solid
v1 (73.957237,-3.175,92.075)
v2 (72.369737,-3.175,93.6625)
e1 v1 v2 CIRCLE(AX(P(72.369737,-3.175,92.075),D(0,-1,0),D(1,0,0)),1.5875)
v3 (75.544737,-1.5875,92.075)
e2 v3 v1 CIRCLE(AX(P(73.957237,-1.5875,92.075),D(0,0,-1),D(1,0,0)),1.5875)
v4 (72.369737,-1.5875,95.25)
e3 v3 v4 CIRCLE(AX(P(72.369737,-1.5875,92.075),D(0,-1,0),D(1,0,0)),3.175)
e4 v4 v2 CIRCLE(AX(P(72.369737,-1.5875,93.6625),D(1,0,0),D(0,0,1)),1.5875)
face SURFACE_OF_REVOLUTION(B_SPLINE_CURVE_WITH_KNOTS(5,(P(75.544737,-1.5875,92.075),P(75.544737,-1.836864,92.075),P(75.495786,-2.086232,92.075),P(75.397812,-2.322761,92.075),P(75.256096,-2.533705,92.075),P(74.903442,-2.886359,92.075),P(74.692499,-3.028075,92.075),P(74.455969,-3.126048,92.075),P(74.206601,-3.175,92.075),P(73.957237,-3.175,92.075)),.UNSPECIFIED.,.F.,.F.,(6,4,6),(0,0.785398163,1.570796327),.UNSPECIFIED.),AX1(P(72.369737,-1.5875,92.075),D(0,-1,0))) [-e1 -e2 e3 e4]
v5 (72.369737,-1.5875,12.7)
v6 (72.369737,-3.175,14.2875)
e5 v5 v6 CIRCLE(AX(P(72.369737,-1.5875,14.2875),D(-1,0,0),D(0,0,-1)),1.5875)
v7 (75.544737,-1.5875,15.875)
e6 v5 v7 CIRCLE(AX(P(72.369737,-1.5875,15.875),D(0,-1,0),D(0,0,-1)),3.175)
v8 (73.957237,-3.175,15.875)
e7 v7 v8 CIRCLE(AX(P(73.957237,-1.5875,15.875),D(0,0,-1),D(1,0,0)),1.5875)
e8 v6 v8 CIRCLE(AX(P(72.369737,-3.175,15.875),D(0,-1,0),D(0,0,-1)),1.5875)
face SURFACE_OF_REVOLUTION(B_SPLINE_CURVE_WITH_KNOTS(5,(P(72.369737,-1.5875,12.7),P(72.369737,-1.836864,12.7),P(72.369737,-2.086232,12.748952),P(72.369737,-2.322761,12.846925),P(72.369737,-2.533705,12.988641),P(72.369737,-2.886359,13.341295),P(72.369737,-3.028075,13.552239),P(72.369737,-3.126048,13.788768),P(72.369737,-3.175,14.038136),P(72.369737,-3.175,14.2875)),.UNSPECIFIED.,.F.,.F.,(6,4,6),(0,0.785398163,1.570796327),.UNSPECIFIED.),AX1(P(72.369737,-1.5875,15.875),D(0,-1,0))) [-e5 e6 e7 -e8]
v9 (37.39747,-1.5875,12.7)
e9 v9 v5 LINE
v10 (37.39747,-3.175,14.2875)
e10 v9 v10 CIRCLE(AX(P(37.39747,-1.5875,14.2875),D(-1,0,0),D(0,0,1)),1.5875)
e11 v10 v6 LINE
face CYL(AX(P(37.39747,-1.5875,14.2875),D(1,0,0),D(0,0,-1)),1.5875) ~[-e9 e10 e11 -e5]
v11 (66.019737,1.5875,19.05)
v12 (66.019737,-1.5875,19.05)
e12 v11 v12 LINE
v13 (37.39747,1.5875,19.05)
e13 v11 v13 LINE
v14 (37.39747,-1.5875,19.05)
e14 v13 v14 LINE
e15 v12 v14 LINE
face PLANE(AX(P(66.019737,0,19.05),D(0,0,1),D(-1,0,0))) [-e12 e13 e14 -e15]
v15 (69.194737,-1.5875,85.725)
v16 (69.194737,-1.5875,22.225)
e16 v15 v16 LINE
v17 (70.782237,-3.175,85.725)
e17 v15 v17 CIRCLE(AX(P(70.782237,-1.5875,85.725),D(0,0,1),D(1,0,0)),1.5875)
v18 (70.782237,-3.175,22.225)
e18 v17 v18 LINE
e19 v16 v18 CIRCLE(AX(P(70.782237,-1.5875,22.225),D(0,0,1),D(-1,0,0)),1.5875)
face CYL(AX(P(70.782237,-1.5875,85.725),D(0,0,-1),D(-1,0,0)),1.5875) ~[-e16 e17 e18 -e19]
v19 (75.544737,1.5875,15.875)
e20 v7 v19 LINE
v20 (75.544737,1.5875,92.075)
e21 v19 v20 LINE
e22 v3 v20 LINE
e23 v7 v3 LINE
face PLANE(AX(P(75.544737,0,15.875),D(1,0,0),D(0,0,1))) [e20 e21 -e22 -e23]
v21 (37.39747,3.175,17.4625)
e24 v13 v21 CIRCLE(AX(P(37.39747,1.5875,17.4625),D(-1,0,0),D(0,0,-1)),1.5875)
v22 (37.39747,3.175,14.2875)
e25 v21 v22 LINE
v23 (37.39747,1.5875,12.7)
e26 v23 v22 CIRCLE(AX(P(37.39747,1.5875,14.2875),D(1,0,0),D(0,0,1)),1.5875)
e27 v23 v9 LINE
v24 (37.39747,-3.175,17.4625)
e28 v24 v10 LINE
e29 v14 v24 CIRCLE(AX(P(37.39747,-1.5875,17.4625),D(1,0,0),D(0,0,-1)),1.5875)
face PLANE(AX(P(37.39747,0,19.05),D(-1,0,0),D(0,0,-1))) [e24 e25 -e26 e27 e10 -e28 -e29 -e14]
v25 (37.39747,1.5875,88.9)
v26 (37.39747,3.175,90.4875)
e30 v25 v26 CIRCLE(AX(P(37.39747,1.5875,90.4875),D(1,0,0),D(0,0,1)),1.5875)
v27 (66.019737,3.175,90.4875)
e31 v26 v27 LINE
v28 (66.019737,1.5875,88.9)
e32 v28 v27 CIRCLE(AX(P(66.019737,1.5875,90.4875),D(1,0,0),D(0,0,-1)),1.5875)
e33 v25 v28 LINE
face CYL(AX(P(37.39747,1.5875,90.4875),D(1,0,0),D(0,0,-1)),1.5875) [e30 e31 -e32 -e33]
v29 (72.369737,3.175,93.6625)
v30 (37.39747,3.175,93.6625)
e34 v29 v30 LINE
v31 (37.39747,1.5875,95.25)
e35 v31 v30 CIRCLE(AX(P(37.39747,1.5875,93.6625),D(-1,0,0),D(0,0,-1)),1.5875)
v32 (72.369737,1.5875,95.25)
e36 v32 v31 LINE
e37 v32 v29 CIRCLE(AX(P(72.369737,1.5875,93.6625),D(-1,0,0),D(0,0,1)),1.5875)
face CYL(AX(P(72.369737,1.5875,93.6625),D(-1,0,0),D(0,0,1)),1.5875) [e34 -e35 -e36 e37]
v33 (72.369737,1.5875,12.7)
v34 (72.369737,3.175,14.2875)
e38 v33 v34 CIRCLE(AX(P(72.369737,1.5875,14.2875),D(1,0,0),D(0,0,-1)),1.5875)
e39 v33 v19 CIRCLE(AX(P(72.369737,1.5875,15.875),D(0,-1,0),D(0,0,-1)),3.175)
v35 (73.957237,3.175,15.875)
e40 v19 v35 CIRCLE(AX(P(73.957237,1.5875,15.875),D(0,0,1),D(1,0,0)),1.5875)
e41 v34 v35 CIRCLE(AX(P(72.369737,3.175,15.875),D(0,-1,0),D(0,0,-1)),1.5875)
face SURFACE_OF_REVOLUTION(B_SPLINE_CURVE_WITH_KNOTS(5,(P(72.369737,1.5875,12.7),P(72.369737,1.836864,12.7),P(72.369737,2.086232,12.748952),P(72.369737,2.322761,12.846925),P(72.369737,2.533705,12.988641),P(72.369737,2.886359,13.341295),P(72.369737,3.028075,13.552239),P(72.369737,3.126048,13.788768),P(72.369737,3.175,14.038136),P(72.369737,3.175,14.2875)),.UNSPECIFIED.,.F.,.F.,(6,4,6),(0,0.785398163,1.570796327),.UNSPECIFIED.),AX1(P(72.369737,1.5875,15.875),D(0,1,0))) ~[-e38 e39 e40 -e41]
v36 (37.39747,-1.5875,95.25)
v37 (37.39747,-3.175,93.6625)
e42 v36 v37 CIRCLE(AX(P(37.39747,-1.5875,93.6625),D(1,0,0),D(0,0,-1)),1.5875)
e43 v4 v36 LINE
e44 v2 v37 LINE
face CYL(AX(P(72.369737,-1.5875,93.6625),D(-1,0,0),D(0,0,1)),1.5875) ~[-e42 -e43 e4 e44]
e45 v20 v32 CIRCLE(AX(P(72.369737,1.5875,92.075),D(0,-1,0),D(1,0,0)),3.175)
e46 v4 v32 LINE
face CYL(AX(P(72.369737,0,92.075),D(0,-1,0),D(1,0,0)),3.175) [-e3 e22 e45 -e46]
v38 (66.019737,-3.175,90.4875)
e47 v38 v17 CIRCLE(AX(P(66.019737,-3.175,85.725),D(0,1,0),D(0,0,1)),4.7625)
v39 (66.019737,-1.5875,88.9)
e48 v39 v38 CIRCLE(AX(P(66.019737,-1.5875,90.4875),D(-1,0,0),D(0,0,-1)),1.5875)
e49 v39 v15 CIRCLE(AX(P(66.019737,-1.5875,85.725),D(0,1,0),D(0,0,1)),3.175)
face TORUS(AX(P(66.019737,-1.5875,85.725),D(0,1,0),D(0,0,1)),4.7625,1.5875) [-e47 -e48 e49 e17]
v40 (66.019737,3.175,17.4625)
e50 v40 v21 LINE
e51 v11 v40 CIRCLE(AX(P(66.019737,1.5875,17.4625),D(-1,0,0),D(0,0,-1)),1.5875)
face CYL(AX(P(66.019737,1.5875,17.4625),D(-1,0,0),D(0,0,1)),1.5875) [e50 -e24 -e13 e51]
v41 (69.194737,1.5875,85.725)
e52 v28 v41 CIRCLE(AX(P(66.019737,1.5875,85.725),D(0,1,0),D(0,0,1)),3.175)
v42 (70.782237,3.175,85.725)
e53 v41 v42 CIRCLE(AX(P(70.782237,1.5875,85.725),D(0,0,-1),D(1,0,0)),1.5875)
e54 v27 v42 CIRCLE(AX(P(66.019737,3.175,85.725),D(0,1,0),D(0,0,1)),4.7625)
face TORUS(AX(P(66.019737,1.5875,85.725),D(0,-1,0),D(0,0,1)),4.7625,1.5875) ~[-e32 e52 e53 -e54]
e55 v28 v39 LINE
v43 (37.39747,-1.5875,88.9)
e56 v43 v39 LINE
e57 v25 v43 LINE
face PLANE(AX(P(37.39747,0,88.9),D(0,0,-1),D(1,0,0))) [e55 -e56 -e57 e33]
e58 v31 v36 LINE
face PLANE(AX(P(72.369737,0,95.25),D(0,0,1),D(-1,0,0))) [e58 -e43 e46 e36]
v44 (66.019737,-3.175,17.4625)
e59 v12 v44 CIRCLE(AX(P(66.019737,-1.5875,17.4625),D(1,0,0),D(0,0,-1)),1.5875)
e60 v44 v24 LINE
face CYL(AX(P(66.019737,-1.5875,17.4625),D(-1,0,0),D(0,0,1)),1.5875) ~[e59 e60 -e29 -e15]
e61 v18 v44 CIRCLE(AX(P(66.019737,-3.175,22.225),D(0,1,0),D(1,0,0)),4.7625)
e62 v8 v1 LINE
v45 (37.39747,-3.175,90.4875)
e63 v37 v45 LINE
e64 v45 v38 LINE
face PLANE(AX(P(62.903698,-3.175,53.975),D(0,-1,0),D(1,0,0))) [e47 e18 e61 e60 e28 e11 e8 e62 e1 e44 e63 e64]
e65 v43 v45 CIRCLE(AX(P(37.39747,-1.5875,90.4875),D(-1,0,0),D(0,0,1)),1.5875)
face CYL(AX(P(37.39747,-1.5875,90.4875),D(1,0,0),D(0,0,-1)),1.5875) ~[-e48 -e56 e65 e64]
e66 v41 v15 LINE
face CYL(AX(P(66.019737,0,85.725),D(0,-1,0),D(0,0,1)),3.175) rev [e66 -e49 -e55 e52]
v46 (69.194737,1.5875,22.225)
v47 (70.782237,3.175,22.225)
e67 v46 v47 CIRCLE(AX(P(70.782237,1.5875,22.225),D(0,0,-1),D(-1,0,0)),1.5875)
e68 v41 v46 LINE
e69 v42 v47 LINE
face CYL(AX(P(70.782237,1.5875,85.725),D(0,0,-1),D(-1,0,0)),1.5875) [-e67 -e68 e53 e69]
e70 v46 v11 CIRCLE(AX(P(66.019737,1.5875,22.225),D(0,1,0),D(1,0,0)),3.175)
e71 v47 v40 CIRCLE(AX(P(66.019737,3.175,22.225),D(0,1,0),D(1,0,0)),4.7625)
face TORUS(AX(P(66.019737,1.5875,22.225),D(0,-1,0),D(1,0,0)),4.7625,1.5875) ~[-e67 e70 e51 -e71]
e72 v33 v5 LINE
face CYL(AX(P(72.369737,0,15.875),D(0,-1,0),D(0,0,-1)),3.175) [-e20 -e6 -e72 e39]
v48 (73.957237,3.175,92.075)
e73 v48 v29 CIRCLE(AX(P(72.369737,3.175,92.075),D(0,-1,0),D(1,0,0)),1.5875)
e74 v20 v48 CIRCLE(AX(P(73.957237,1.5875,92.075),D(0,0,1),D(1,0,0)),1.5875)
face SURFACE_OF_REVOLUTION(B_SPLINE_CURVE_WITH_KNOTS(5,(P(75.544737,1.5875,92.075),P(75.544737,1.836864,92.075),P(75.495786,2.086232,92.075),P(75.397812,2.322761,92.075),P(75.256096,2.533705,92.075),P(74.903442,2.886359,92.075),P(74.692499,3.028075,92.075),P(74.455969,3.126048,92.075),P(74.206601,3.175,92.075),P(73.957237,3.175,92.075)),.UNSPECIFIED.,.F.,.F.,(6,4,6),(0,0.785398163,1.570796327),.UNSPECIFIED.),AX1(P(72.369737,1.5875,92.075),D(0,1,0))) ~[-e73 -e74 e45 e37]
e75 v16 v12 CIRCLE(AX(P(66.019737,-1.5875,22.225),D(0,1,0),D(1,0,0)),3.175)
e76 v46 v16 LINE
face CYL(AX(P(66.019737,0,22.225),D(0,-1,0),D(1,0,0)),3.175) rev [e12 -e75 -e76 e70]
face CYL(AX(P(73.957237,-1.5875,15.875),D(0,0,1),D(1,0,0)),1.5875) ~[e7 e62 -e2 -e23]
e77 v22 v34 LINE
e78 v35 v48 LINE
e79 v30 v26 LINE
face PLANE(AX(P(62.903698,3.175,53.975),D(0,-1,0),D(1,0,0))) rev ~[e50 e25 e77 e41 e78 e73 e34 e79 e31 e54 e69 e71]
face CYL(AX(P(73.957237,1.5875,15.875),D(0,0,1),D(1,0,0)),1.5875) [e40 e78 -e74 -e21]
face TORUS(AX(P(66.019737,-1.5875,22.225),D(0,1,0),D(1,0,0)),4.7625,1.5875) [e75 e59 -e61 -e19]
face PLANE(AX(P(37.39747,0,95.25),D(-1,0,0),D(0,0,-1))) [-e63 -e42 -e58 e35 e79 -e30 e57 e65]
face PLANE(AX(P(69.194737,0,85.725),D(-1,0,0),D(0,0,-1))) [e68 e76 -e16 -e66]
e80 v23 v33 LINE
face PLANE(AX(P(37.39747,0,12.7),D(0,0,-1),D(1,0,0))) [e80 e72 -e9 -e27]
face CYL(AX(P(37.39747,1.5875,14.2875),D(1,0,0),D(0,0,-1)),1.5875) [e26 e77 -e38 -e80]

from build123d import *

# Parameters (mm, degrees)
F3_DEPTH = 3.175
F4_R     = 1.5875


# Not quite as in the source:
# - the program builds the solid bodies; features that only make, move or delete a surface that nothing else refers to are left out


with BuildPart() as f3:
    # F2 (on Front) → F3 (new body, symmetric)
    with BuildSketch(Plane.XZ):
        with BuildLine():
            Line((72.3697372794, 95.25), (37.3974703252, 95.25))
            Line((37.3974703252, 95.25), (37.3974703252, 88.9))
            Line((37.3974703252, 88.9), (66.0197372794, 88.9))
            ThreePointArc((66.0197372794, 88.9), (68.2648013097, 87.9700640303), (69.1947372794, 85.725))
            Line((69.1947372794, 85.725), (69.1947372794, 22.225))
            ThreePointArc((69.1947372794, 22.225), (68.2648013097, 19.9799359697), (66.0197372794, 19.05))
            Line((66.0197372794, 19.05), (37.3974703252, 19.05))
            Line((37.3974703252, 19.05), (37.3974703252, 12.7))
            Line((37.3974703252, 12.7), (72.3697372794, 12.7))
            ThreePointArc((72.3697372794, 12.7), (74.6148013097, 13.6299359697), (75.5447372794, 15.875))
            Line((75.5447372794, 15.875), (75.5447372794, 92.075))
            ThreePointArc((75.5447372794, 92.075), (74.6148013097, 94.3200640303), (72.3697372794, 95.25))
        make_face()
    extrude(amount=F3_DEPTH, both=True)

    # F4
    f4_edges = [f3.edges().sort_by_distance(p)[0] for p in [
        (54.883604, -3.175, 12.7),
        (54.883604, 3.175, 12.7),
        (51.708604, 3.175, 19.05),
        (51.708604, -3.175, 19.05),
    ]]
    fillet(f4_edges, radius=F4_R)


solid = f3.part
